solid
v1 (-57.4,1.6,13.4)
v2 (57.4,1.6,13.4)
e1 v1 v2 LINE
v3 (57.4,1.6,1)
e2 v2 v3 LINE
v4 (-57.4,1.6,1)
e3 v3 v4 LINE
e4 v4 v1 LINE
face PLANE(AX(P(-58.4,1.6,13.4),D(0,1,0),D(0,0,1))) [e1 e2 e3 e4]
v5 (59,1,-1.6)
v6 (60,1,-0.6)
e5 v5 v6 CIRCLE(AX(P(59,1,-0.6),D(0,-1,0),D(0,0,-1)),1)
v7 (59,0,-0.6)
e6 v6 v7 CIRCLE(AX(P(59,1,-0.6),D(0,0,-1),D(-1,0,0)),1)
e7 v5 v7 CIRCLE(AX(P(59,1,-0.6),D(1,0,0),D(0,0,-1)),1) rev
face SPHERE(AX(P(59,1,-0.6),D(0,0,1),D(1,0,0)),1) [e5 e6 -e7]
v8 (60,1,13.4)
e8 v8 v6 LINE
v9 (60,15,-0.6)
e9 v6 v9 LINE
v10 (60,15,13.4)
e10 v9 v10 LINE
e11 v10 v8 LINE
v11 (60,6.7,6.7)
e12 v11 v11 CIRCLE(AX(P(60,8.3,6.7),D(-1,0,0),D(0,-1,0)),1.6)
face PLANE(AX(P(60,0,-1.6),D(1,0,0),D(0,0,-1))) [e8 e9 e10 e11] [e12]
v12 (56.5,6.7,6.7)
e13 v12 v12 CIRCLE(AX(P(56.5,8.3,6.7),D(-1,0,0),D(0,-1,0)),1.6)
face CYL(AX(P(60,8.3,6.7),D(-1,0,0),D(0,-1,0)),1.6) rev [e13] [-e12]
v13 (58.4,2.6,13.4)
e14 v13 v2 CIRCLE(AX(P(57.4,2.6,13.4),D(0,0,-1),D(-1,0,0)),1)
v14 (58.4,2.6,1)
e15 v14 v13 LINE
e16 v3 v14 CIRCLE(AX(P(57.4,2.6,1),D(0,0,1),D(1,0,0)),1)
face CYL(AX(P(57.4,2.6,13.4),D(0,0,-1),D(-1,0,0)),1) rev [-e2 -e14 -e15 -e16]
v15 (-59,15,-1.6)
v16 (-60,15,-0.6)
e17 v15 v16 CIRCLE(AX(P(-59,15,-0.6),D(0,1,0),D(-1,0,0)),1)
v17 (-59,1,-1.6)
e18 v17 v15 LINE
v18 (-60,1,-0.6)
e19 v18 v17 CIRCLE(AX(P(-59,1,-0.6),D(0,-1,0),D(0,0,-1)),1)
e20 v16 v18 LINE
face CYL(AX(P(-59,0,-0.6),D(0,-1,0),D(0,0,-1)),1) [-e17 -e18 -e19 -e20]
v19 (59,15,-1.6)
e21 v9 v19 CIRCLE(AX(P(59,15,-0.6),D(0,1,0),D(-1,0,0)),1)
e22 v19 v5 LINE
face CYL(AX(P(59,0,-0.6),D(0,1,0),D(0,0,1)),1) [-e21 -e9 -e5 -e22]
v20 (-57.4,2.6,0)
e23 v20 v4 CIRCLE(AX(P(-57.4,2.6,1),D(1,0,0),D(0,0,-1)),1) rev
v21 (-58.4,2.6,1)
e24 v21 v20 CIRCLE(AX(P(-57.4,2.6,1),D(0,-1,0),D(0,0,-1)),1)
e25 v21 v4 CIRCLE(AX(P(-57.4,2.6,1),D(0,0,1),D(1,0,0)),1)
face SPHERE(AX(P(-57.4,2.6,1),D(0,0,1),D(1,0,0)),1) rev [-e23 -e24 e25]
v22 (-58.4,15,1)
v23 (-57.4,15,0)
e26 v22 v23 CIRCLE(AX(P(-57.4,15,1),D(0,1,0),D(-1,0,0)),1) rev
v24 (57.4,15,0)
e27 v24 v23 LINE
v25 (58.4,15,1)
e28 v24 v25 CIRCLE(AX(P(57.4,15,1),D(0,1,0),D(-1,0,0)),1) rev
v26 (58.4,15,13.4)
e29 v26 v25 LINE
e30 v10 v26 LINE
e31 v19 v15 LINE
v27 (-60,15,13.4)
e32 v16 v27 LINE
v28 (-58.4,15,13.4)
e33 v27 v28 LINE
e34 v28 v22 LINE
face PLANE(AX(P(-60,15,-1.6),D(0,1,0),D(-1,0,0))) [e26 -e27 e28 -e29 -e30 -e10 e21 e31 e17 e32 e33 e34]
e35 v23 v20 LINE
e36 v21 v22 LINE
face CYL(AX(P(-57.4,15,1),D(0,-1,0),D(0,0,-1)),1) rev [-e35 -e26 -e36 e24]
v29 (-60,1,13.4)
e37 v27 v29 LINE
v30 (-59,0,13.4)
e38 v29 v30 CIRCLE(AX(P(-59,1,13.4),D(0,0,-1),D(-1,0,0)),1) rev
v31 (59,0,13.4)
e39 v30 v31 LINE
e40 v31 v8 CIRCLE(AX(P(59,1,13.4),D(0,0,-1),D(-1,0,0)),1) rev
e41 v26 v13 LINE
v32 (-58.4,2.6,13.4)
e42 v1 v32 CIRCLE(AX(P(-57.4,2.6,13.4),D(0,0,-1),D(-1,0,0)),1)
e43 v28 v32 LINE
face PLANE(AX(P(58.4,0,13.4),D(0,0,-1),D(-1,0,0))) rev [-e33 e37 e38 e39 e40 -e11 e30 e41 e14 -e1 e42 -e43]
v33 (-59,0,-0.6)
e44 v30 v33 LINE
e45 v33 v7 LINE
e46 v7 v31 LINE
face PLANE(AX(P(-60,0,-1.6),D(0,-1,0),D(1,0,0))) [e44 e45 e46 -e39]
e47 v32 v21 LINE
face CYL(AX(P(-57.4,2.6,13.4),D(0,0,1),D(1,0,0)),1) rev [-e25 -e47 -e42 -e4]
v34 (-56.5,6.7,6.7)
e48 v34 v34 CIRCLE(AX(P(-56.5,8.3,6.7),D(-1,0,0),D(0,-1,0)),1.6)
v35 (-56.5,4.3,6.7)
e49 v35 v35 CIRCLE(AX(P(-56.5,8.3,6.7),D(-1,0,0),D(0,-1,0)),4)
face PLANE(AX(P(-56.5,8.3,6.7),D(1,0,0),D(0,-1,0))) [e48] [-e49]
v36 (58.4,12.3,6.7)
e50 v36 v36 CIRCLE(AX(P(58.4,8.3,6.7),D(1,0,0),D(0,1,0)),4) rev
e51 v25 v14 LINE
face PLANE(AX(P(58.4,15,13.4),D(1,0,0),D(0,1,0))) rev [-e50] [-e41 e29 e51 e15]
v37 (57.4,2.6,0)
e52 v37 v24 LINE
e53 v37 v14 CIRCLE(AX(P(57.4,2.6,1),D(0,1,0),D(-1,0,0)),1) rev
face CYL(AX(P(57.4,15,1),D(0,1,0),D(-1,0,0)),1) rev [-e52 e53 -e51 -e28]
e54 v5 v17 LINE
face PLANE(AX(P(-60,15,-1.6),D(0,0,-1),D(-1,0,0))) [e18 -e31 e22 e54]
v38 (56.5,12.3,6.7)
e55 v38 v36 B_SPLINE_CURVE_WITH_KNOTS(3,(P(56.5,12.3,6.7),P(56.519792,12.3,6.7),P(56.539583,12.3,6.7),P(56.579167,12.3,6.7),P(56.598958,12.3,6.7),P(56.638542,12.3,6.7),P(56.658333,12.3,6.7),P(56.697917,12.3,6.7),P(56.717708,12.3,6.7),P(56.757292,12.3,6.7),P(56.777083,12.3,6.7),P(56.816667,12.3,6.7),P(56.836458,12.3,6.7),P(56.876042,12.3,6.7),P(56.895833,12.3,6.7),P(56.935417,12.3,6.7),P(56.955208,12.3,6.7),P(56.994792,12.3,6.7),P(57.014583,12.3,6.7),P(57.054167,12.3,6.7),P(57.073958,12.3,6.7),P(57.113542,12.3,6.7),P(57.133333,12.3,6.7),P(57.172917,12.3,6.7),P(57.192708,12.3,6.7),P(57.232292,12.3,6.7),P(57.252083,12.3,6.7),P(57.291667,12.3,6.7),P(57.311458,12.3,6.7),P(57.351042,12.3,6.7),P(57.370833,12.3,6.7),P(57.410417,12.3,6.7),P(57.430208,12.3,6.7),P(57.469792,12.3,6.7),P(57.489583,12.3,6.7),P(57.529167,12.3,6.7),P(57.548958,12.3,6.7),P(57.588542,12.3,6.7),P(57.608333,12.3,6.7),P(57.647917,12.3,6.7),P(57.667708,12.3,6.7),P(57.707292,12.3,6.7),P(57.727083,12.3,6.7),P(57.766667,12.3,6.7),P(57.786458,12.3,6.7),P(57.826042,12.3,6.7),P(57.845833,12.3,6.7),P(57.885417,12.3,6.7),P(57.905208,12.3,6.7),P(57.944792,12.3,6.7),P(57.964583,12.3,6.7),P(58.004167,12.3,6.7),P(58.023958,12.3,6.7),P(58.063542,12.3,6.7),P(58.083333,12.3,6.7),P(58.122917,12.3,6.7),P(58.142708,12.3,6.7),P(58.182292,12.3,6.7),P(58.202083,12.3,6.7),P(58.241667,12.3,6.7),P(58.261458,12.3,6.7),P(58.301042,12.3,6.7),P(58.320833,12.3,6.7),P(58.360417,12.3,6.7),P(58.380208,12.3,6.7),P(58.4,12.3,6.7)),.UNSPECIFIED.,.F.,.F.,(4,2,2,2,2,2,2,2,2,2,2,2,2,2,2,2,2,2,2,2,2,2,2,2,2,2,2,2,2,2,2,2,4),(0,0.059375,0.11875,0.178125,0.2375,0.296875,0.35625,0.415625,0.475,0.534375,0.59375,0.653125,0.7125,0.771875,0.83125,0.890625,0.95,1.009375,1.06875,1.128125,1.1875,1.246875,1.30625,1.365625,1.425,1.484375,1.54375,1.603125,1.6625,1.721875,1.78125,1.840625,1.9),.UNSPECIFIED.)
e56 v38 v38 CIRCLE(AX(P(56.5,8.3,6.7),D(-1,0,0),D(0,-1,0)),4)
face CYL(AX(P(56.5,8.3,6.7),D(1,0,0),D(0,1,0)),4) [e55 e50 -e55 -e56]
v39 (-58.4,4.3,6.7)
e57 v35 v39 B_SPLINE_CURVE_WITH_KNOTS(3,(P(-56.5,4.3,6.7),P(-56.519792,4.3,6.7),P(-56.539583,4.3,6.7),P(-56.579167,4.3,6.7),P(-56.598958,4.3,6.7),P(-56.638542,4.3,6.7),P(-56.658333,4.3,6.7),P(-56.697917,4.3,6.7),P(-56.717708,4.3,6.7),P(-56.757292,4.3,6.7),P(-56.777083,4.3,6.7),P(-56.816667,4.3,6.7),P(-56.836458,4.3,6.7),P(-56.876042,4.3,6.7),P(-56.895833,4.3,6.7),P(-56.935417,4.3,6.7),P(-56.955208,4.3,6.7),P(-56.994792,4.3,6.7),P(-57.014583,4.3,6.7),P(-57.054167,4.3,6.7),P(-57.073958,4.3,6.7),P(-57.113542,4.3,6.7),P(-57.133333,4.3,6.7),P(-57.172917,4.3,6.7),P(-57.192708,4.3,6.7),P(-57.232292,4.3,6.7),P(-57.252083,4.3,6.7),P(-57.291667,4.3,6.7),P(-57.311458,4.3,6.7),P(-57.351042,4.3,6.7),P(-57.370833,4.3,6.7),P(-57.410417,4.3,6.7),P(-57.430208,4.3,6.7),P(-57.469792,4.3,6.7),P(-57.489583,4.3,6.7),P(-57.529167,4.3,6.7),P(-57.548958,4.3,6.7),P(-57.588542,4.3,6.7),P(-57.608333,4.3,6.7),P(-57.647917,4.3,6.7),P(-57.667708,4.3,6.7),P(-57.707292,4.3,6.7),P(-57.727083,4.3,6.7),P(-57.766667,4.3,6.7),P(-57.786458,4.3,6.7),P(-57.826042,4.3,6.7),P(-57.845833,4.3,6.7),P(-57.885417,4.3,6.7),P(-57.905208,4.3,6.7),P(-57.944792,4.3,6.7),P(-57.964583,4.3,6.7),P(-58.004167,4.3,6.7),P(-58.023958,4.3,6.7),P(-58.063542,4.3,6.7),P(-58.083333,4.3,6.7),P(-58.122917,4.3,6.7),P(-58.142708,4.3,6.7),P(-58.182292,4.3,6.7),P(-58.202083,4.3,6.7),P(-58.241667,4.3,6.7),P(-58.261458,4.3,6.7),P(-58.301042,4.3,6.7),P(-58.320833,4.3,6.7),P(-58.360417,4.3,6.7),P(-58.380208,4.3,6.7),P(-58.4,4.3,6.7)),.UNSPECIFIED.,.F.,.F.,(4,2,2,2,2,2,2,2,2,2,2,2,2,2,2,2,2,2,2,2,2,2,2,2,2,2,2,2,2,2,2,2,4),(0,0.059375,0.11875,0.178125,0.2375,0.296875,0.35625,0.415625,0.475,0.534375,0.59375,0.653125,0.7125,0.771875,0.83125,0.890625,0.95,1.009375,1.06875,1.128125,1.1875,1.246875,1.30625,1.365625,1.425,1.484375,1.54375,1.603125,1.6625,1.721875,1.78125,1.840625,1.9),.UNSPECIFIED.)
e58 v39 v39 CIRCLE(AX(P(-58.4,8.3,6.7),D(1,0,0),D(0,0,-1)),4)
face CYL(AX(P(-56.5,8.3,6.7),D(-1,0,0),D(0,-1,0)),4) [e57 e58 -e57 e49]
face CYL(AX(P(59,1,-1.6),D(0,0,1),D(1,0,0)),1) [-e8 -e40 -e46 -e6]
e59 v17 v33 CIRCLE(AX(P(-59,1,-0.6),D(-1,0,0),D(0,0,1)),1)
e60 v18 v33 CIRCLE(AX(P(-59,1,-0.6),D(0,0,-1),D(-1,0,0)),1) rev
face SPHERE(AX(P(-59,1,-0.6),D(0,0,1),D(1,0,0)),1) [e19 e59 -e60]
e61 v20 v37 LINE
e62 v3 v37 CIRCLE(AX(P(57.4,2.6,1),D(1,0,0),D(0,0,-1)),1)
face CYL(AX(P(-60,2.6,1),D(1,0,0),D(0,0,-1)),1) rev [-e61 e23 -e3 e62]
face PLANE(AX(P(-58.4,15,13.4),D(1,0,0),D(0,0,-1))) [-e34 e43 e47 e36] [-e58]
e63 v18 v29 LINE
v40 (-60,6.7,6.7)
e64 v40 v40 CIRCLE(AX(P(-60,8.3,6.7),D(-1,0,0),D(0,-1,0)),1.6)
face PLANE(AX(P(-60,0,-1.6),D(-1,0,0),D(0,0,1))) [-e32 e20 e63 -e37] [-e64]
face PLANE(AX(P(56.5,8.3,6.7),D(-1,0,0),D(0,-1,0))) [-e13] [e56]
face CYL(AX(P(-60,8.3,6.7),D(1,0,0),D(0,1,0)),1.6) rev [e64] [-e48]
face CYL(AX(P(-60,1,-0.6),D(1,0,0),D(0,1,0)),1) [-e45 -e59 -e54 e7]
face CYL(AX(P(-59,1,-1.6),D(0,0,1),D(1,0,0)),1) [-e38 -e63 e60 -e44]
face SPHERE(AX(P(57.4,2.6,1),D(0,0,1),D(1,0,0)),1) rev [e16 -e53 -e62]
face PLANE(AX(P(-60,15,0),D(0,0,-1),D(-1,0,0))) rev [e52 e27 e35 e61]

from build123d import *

# Parameters (mm, degrees)
SKETCH_1_W             = 120
SKETCH_1_H             = 15
SM_BASE_FLANGE_1_DEPTH = 1.6
EXTRUDE_1_OUTLINE_W    = 116.8
EXTRUDE_1_OUTLINE_H    = 1.6
EXTRUDE_1_DEPTH        = 13.4
SKETCH_37_5_W          = 1.6
SKETCH_37_5_H          = 15
EXTRUDE_2_DEPTH        = 13.4
SKETCH_45_R            = 4
EXTRUDE_4_DEPTH        = 1.9
SKETCH_46_R            = 1.6
CUT_EXTRUDE_2_DEPTH    = 119.223559412
FILLET_3_R             = 1
FILLET_4_R             = 1


# Read off the part's stored shape, not the designer's step: 拉伸-薄壁1
# Sheet-metal steps are written as plain solids
with BuildPart() as part:
    # Sketch 1 → 基体-法兰1 (new body)
    with BuildSketch(Plane.XY):
        with Locations((0, 7.5)):
            Rectangle(SKETCH_1_W, SKETCH_1_H)
    extrude(amount=-SM_BASE_FLANGE_1_DEPTH)

    # 拉伸-薄壁1 outline → 拉伸-薄壁1 (add)
    with BuildSketch(Plane.XY):
        with Locations((0, 0.8)):
            Rectangle(EXTRUDE_1_OUTLINE_W, EXTRUDE_1_OUTLINE_H)
    extrude(amount=EXTRUDE_1_DEPTH)

    # 草图37<5> → 凸台-拉伸2 (add)
    with BuildSketch(Plane.XY):
        with Locations((-59.2, 7.5)):
            Rectangle(SKETCH_37_5_W, SKETCH_37_5_H)
        with Locations((59.2, 7.5)):
            Rectangle(SKETCH_37_5_W, SKETCH_37_5_H)
    extrude(amount=EXTRUDE_2_DEPTH)

    # 草图45 → 凸台-拉伸4 (add)
    with BuildSketch(Plane.ZY.offset(-58.4)):
        with Locations(Location((6.7, 8.3, 0), (0, 0, 90))):
            Circle(SKETCH_45_R)
    extrude_4 = extrude(amount=EXTRUDE_4_DEPTH)

    # 镜向1: 凸台-拉伸4 across plane
    add(extrude_4.mirror(Plane(origin=(0, 0, 0), x_dir=(0, 0, 1), z_dir=(1, 0, 0))))

    # 草图46 → 切除-拉伸2 (cut, through all)
    with BuildSketch(Plane.ZY.offset(-56.5)):
        with Locations(Location((6.7, 8.3, 0), (0, 0, 270))):
            Circle(SKETCH_46_R)
    cut_extrude_2 = extrude(amount=-CUT_EXTRUDE_2_DEPTH, mode=Mode.SUBTRACT)

    # 镜向2: 切除-拉伸2 across plane
    add(cut_extrude_2.mirror(Plane(origin=(0, 0, 0), x_dir=(0, 0, 1), z_dir=(1, 0, 0))), mode=Mode.SUBTRACT)

    # 圆角3
    fillet_3_edges = [part.edges().sort_by_distance(p)[0] for p in [
        (60, 7.5, -1.6),
        (0, 1.6, 0),
        (58.4, 8.3, 0),
        (-60, 7.5, -1.6),
        (-58.4, 8.3, 0),
        (0, 0, -1.6),
        (60, 0, 5.9),
        (-60, 0, 5.9),
    ]]
    fillet(fillet_3_edges, radius=FILLET_3_R)

    # 圆角4
    # the kernel refuses this fillet: 1 mm, written as the material it adds along each edge
    with BuildSketch(Plane(origin=(-57.4, 2.6, 1), x_dir=(0, -1, 0), z_dir=(-1, 0, 0))) as fillet_4_piece_1_section:
        Polygon((0, 0), (FILLET_4_R, 0), (FILLET_4_R, -FILLET_4_R), (0, -FILLET_4_R), align=None)
    fillet_4_piece_1 = extrude(amount=FILLET_4_R, mode=Mode.PRIVATE)
    fillet_4_piece_1 = fillet_4_piece_1 - Plane(origin=(-57.4, 2.6, 1), x_dir=(0, 0.7071067811865475, 0.7071067811865475), z_dir=(-1, 0, 0)) * Sphere(FILLET_4_R, mode=Mode.PRIVATE)
    add(fillet_4_piece_1)
    with BuildSketch(Plane(origin=(57.4, 2.6, 1), x_dir=(0, -1, 0), z_dir=(1, 0, 0))) as fillet_4_piece_2_section:
        Polygon((0, 0), (FILLET_4_R, 0), (FILLET_4_R, FILLET_4_R), (0, FILLET_4_R), align=None)
    fillet_4_piece_2 = extrude(amount=FILLET_4_R, mode=Mode.PRIVATE)
    fillet_4_piece_2 = fillet_4_piece_2 - Plane(origin=(57.4, 2.6, 1), x_dir=(0, 0.7071067811865475, 0.7071067811865475), z_dir=(1, 0, 0)) * Sphere(FILLET_4_R, mode=Mode.PRIVATE)
    add(fillet_4_piece_2)
    with BuildSketch(Plane(origin=(58.4, 1.6, 1), x_dir=(0, 1, 0), z_dir=(0, 0, 1))) as fillet_4_piece_3:
        with BuildLine():
            CenterArc((FILLET_4_R, FILLET_4_R), FILLET_4_R, 180, 90)
            Line((0, FILLET_4_R), (0, 0))
            Line((0, 0), (FILLET_4_R, 0))
        make_face()
    extrude(amount=12.4)
    with BuildSketch(Plane(origin=(-58.4, 1.6, 1), x_dir=(0, 1, 0), z_dir=(0, 0, 1))) as fillet_4_piece_4:
        with BuildLine():
            CenterArc((FILLET_4_R, -FILLET_4_R), FILLET_4_R, 90, 90)
            Line((0, -FILLET_4_R), (0, 0))
            Line((0, 0), (FILLET_4_R, 0))
        make_face()
    extrude(amount=12.4)


solid = part.part
